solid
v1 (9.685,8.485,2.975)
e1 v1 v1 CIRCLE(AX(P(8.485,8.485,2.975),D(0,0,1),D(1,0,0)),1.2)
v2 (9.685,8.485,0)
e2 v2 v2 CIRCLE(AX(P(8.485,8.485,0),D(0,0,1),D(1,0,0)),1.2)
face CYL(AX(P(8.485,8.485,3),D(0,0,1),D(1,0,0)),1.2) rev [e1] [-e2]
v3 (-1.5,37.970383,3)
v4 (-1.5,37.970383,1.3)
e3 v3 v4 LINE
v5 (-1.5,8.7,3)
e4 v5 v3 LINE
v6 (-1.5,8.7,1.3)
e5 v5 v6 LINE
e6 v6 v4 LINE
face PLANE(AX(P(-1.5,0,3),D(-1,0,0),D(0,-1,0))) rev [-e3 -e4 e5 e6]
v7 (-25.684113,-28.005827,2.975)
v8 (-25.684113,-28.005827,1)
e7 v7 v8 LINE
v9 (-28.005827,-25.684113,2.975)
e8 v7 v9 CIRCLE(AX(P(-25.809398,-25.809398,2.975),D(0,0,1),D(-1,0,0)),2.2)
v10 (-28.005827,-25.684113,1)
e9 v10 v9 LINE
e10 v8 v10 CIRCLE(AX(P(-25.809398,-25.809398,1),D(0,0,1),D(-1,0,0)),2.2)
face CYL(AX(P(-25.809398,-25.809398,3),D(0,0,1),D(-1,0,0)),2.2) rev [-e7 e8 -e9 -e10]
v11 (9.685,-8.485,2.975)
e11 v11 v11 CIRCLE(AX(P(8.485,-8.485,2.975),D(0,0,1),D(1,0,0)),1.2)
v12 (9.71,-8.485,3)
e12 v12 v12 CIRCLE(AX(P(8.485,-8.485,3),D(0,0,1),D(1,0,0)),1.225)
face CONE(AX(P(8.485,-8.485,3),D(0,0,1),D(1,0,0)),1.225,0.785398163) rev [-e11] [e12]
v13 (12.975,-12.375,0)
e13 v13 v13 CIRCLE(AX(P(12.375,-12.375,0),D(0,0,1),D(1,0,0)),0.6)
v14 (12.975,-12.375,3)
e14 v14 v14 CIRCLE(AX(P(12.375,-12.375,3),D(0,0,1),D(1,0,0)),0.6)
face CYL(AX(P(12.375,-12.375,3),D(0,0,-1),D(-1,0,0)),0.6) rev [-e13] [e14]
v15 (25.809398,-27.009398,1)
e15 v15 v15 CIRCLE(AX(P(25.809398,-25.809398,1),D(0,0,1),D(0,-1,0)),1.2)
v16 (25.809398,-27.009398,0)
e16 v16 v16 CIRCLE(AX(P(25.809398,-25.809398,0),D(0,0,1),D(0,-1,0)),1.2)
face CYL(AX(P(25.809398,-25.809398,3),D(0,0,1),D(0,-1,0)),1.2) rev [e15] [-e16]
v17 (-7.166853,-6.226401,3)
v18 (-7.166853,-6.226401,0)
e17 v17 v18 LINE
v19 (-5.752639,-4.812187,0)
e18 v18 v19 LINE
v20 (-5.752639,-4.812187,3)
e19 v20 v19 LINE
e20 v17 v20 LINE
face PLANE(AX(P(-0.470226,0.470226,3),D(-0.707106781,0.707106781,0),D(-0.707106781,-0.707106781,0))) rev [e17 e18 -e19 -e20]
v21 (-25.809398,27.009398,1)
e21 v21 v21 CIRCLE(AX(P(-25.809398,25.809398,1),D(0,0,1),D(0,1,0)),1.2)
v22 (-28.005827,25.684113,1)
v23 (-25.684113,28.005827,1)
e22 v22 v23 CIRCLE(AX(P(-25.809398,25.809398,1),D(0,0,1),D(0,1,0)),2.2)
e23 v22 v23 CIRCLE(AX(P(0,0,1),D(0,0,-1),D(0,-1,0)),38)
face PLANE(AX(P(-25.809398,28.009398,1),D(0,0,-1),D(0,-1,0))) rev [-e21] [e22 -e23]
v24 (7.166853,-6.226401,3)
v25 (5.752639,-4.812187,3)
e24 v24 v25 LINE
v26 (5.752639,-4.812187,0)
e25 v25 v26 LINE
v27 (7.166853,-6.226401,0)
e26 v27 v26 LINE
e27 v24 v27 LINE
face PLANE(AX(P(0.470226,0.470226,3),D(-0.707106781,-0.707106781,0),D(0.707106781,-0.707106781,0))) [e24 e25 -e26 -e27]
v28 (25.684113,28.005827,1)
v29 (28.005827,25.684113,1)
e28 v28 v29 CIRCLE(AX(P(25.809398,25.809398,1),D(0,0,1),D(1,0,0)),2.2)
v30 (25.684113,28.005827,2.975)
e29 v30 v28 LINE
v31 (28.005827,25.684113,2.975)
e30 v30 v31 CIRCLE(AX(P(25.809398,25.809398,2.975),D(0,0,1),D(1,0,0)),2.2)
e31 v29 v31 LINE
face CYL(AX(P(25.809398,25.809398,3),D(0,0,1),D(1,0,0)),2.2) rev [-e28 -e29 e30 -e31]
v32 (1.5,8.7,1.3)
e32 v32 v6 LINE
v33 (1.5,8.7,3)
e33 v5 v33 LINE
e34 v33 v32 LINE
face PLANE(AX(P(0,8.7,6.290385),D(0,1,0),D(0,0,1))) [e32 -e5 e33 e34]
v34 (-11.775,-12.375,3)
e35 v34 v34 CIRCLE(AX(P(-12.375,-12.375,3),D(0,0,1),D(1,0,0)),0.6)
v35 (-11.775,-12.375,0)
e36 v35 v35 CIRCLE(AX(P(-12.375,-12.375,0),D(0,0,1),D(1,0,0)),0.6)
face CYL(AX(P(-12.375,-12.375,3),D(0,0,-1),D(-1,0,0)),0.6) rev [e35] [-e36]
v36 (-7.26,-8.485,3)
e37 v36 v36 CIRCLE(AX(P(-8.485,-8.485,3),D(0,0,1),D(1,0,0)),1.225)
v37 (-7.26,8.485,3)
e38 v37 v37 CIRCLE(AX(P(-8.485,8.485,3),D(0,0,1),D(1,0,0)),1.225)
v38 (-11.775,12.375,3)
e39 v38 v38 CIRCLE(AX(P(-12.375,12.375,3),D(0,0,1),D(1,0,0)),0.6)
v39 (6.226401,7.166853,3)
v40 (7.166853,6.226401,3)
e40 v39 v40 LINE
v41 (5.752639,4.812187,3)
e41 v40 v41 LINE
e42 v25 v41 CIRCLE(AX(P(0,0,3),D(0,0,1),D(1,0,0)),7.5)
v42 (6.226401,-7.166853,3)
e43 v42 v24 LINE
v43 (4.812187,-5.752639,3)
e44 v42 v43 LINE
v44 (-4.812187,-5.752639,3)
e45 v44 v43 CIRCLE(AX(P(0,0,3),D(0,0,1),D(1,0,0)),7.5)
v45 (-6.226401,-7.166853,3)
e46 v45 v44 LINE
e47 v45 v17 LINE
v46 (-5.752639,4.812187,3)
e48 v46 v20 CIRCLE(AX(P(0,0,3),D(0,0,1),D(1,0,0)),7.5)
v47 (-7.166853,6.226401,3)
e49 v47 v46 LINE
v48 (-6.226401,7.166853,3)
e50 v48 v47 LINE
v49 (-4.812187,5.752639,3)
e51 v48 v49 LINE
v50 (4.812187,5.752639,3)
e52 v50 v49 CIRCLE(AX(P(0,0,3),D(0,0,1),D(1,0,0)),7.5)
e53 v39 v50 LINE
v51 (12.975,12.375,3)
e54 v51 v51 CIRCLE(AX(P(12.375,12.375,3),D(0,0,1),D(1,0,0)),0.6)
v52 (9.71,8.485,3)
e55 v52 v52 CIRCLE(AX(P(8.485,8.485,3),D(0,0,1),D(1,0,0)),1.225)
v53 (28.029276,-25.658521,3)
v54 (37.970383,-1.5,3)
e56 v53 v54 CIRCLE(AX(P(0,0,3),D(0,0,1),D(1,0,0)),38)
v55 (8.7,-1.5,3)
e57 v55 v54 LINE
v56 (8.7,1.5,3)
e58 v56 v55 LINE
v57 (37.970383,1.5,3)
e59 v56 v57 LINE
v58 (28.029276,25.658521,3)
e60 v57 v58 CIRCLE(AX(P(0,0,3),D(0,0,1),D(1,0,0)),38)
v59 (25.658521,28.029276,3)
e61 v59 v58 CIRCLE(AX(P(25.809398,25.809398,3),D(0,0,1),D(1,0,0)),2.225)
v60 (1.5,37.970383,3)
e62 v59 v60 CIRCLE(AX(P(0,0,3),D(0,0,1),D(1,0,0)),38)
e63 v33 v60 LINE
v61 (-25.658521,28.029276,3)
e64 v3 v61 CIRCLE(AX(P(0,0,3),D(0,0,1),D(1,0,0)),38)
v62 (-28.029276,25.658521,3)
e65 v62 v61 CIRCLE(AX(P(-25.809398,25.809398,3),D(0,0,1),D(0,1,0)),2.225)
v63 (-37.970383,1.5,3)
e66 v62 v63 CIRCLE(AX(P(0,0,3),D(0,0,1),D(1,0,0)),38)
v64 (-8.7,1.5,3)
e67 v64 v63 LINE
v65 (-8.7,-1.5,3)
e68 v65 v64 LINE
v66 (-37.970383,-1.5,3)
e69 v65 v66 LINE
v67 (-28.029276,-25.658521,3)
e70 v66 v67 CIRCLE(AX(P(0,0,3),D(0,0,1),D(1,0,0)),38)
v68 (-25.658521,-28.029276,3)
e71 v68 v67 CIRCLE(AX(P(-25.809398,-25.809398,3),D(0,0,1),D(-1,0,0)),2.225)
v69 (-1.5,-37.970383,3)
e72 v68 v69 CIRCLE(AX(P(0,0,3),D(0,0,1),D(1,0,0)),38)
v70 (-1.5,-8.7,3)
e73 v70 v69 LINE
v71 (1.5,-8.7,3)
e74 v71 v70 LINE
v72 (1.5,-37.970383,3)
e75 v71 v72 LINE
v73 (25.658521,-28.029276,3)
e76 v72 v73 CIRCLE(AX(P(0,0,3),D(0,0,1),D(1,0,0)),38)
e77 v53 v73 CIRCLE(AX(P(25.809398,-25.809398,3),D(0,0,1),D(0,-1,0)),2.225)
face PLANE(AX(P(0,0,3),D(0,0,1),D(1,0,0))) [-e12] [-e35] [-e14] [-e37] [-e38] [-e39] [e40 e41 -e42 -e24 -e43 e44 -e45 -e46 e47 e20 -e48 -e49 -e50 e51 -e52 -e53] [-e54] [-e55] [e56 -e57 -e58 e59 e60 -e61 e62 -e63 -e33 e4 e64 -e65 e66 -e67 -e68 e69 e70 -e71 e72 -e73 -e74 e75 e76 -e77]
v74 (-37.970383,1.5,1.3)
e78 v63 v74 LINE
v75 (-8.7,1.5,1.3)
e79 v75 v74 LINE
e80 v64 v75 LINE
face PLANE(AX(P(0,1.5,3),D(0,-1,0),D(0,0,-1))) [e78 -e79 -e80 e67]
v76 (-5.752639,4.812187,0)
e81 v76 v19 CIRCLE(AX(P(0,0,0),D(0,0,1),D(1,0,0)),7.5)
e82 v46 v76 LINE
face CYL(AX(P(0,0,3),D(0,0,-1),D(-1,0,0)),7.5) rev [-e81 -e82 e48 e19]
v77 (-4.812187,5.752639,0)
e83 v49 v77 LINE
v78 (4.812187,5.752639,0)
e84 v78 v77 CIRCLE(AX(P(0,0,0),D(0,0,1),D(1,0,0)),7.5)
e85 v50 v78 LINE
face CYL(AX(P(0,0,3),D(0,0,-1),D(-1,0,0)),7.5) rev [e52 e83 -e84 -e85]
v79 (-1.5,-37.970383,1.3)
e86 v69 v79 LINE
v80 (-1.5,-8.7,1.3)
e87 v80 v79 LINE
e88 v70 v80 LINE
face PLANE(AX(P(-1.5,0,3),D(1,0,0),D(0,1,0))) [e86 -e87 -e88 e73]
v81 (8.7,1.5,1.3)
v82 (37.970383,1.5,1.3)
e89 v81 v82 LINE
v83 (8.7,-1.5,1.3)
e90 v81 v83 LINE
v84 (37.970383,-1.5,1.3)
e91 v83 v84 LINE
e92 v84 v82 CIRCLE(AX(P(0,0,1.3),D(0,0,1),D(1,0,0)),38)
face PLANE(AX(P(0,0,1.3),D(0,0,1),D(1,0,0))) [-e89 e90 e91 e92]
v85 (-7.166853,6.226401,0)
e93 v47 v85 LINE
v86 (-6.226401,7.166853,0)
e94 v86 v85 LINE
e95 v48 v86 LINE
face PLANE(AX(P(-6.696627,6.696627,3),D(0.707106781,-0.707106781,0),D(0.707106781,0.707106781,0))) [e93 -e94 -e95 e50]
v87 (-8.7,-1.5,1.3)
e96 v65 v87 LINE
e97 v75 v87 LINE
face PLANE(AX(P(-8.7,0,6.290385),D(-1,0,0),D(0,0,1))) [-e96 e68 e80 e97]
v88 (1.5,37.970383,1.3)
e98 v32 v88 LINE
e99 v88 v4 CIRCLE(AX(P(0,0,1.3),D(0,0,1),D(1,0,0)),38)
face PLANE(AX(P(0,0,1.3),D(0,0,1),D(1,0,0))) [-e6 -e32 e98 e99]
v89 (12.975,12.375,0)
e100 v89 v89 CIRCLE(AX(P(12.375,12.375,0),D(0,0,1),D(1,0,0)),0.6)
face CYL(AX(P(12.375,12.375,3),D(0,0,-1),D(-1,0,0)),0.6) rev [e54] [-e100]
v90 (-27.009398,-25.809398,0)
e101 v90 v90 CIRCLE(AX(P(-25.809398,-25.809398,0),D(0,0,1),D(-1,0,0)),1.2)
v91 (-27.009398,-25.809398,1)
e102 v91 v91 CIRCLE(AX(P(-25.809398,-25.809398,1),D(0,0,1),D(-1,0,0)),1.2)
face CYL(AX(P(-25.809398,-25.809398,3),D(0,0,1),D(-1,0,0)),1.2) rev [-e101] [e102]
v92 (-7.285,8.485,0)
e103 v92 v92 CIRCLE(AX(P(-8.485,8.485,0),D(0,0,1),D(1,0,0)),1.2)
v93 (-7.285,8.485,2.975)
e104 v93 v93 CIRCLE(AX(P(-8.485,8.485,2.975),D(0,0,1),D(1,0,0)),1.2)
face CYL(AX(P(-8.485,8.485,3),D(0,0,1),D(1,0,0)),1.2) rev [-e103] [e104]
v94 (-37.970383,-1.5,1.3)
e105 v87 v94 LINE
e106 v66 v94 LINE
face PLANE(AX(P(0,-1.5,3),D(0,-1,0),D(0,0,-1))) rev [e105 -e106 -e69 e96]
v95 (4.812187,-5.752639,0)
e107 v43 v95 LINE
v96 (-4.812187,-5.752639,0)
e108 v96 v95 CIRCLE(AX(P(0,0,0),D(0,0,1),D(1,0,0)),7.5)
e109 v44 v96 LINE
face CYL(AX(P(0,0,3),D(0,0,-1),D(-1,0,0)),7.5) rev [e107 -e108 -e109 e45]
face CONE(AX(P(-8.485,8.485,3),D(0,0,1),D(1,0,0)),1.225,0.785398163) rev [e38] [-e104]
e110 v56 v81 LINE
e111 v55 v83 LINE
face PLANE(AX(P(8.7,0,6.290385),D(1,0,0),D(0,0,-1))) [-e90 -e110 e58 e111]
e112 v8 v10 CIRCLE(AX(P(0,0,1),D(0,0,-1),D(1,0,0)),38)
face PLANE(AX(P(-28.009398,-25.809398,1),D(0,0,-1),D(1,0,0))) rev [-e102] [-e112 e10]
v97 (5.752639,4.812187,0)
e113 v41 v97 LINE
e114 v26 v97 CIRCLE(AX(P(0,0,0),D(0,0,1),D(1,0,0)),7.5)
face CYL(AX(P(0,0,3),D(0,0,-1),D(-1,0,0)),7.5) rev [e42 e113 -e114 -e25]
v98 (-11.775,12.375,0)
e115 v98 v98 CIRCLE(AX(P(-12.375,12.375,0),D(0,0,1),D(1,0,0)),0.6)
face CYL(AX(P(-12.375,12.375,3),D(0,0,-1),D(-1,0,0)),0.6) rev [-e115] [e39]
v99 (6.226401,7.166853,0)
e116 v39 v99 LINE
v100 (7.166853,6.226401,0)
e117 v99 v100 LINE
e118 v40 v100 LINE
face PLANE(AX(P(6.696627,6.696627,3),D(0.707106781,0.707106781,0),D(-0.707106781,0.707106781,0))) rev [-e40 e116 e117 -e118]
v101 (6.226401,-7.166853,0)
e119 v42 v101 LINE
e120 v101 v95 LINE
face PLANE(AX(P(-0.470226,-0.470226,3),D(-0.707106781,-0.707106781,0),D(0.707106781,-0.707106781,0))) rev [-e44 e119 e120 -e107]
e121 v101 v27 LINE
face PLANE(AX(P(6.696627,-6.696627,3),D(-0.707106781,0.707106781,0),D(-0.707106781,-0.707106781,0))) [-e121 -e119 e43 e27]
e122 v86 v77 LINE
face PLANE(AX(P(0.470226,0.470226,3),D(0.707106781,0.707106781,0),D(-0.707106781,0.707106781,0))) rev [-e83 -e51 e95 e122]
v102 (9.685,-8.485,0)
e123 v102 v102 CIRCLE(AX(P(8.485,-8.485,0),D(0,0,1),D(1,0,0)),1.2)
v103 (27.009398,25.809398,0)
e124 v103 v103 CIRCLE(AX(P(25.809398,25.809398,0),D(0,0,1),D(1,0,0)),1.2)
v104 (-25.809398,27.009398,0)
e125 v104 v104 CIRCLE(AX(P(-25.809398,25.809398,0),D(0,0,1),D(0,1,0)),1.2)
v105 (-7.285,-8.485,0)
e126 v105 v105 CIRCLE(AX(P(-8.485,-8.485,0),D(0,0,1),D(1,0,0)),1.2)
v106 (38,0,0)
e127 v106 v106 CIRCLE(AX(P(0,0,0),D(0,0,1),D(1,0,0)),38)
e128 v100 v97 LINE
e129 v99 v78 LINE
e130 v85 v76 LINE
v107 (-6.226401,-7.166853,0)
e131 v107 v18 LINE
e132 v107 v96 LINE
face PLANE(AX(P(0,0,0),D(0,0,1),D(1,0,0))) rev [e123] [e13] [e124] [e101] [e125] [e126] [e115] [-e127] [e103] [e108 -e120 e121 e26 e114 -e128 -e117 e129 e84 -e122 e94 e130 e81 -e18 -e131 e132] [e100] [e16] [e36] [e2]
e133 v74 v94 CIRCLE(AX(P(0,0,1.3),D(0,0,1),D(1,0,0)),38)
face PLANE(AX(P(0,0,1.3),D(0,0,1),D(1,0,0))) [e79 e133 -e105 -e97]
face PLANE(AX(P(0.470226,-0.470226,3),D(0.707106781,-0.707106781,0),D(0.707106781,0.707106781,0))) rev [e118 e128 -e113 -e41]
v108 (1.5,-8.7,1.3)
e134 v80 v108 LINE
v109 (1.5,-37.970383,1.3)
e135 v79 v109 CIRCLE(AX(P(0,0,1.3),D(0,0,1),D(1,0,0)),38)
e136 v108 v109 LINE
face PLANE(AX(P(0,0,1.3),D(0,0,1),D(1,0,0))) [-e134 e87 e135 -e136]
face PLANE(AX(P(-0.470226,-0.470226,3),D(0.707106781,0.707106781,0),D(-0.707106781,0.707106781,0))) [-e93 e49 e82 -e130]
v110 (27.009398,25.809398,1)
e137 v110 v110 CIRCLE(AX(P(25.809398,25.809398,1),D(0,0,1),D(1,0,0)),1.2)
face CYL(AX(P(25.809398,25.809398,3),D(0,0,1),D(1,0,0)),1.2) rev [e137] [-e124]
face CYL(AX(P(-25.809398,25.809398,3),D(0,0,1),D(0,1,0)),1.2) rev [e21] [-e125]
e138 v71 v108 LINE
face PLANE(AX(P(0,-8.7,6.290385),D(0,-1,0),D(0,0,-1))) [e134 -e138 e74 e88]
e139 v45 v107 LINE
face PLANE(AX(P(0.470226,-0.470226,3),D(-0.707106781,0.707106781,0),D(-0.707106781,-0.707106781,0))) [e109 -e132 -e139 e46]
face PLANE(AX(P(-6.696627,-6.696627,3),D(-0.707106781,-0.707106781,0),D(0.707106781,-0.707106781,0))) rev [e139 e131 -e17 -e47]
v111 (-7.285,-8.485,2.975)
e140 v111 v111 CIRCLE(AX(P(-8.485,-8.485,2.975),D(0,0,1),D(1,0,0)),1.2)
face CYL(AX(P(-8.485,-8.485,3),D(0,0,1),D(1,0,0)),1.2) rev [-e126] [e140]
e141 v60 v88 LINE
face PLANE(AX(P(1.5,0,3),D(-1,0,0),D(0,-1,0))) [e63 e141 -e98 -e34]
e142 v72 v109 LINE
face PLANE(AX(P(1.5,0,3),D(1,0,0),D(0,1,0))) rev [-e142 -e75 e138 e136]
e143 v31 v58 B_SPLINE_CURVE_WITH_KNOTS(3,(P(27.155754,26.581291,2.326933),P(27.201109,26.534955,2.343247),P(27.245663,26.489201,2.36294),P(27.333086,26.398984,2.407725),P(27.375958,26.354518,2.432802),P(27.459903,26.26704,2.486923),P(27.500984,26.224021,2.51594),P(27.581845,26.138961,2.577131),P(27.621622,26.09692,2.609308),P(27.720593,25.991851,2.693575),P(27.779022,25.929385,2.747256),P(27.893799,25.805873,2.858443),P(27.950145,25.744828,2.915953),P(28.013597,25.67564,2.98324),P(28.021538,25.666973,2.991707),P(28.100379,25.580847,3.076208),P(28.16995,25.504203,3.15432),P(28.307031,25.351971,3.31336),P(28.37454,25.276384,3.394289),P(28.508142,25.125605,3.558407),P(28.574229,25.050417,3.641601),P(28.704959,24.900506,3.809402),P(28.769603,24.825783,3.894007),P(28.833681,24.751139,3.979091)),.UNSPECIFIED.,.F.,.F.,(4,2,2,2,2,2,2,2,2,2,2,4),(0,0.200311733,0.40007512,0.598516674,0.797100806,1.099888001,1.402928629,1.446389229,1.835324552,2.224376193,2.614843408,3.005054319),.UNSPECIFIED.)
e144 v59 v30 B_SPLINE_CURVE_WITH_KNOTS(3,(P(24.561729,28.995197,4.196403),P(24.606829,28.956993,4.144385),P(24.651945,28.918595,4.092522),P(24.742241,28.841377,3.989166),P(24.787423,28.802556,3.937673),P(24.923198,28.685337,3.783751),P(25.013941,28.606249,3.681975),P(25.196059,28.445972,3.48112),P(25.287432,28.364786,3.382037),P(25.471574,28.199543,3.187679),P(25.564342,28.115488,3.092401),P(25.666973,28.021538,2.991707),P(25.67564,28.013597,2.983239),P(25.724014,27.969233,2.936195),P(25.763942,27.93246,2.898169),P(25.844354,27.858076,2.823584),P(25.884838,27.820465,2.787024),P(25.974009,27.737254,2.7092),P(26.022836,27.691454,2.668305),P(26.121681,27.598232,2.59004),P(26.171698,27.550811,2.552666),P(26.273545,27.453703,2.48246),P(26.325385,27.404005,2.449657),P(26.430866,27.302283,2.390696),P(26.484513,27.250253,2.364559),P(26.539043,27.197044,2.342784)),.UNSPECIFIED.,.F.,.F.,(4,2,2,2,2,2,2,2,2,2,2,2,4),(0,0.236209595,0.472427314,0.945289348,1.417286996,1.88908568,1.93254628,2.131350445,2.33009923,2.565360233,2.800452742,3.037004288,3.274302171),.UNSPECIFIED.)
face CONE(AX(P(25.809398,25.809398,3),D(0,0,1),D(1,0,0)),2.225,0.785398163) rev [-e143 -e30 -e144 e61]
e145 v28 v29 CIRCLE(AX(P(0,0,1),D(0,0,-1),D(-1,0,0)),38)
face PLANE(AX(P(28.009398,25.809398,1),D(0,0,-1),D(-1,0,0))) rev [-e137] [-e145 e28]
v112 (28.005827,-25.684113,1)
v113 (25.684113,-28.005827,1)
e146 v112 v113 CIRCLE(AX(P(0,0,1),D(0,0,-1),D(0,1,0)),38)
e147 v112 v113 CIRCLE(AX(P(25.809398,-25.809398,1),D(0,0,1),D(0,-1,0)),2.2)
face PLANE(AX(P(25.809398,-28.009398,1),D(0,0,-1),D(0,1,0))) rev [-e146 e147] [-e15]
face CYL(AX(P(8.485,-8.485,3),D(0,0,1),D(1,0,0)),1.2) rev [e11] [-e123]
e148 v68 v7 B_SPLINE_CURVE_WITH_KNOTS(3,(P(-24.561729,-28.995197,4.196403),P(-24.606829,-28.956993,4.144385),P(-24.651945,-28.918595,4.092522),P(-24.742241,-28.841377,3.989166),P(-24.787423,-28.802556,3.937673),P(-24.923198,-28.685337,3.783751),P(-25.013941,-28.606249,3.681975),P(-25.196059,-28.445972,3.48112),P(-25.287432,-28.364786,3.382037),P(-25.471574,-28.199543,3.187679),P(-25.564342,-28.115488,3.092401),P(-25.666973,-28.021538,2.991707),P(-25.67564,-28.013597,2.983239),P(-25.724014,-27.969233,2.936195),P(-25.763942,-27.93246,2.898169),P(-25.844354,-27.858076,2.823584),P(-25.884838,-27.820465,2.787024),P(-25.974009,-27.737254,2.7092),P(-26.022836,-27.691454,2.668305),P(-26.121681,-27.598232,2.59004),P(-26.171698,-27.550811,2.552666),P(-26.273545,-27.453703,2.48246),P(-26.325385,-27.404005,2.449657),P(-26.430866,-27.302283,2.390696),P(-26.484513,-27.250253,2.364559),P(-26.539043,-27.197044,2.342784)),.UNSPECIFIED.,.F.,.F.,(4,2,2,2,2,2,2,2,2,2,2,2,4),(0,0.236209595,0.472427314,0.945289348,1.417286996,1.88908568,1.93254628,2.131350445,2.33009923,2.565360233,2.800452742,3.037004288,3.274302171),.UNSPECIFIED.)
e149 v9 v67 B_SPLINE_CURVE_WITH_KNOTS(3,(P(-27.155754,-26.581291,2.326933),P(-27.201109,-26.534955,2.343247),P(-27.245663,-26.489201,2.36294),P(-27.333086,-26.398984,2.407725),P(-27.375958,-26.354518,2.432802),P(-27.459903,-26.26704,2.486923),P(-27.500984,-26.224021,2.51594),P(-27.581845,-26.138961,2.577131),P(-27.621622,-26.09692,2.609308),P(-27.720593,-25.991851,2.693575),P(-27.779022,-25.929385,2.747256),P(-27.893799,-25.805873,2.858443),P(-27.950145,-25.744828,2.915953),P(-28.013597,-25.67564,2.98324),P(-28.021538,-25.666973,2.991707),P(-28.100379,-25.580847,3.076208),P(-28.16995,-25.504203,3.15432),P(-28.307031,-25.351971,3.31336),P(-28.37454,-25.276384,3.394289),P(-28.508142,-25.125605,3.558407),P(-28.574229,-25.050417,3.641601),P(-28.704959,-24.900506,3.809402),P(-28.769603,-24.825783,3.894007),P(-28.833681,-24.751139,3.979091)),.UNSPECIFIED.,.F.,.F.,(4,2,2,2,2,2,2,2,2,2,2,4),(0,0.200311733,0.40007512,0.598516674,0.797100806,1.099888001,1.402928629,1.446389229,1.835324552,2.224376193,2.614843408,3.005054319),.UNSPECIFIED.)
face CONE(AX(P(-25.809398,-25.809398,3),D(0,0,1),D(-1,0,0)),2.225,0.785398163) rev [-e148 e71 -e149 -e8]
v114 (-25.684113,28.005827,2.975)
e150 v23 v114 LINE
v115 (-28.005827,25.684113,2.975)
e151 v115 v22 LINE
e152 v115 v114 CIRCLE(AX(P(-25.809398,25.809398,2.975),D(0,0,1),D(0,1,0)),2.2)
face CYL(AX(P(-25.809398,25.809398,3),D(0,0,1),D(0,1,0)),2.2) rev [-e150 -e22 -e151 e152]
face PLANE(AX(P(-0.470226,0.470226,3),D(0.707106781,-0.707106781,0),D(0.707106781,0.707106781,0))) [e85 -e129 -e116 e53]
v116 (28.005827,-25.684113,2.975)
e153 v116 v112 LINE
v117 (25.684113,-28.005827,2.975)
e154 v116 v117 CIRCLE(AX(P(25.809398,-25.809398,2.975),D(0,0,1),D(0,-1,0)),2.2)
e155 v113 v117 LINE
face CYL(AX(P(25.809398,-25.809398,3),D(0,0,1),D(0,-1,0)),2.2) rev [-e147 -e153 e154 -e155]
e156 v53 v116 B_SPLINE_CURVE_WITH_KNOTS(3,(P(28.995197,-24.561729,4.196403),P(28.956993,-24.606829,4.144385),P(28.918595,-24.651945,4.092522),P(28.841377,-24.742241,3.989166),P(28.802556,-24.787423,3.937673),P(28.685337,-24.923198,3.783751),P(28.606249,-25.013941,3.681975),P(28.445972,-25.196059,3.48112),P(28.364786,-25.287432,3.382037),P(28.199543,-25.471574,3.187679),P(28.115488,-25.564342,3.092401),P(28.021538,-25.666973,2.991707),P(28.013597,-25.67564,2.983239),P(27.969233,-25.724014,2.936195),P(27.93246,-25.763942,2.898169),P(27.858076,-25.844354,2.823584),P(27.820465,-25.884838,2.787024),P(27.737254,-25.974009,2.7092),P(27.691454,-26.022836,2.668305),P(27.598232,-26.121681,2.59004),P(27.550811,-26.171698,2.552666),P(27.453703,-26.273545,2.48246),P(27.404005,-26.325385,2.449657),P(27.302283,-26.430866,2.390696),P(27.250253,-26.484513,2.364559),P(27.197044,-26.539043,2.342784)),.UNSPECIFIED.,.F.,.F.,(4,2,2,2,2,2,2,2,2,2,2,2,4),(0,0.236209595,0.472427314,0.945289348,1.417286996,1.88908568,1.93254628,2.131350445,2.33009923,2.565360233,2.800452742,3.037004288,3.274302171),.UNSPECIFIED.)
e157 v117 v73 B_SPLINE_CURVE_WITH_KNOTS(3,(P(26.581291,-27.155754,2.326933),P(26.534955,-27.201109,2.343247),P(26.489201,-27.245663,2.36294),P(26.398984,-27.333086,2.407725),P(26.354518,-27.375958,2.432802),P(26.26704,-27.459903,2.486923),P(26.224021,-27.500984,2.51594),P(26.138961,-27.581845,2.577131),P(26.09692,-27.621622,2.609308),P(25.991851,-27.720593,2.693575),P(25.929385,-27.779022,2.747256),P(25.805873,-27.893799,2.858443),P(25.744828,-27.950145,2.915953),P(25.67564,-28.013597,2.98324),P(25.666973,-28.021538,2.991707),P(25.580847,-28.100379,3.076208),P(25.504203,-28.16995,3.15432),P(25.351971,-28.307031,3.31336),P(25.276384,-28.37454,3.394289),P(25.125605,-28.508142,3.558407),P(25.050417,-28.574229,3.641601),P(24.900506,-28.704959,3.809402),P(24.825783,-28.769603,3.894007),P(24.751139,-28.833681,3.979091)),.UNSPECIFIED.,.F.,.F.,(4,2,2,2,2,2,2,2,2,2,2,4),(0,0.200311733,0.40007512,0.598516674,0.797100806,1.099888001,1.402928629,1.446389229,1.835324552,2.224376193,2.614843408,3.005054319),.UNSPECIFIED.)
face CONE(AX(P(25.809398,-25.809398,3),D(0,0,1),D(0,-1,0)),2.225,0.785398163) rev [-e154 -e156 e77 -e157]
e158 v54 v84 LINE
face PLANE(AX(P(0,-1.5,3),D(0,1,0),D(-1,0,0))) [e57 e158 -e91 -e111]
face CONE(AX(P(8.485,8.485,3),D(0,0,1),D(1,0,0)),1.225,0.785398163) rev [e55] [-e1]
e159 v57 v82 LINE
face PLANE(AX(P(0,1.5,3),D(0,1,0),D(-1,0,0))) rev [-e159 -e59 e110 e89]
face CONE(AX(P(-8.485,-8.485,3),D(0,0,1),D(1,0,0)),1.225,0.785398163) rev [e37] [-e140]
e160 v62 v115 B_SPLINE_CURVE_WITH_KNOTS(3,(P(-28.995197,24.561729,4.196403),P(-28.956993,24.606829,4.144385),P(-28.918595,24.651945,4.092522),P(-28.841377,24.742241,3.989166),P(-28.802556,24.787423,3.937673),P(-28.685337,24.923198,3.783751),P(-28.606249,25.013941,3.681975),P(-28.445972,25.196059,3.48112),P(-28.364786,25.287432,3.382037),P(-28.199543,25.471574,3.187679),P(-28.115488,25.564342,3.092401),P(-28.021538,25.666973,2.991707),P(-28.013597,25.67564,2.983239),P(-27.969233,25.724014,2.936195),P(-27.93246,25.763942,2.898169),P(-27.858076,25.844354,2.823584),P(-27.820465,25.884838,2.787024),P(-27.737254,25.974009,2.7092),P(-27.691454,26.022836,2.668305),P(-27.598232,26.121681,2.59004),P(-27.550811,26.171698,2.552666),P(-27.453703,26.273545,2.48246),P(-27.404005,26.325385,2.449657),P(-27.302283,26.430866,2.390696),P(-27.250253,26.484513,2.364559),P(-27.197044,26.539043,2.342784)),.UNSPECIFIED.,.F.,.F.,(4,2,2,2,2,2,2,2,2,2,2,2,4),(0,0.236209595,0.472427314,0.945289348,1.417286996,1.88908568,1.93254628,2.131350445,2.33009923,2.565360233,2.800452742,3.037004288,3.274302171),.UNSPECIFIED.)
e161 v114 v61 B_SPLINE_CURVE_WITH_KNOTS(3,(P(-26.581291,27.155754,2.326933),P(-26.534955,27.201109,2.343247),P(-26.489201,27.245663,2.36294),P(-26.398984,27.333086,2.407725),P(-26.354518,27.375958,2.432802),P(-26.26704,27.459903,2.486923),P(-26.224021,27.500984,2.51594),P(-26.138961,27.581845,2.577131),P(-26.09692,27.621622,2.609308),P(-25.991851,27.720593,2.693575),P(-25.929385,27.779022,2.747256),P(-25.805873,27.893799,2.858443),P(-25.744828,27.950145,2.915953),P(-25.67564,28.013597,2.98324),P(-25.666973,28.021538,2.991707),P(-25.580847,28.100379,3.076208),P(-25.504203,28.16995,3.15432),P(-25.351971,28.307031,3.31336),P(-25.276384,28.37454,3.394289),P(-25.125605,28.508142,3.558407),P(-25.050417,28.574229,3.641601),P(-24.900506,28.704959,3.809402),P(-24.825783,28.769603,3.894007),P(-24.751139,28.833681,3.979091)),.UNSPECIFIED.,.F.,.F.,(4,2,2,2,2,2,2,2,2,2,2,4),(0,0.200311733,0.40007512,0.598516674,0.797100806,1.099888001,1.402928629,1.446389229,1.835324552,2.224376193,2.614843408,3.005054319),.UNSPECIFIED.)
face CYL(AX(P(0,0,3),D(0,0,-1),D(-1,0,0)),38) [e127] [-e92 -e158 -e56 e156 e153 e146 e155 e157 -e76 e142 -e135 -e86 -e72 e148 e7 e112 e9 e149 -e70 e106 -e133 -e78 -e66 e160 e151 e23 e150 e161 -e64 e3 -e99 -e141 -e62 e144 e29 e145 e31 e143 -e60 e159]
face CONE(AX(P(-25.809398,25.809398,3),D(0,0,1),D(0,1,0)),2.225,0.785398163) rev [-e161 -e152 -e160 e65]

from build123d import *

# Parameters (mm, degrees)
SKETCH1_R             = 0.6
BOSS_EXTRUDE1_DEPTH   = 3
BOSS_EXTRUDE1_2_DEPTH = 3
BOSS_EXTRUDE1_3_DEPTH = 3
BOSS_EXTRUDE1_4_DEPTH = 3
BOSS_EXTRUDE2_DEPTH   = 1.3
BOSS_EXTRUDE3_DEPTH   = 3
CIRPATTERN1_COUNT     = 4


# Read off the part's stored shape, not the designer's step: M2 Clearance Hole1
with BuildPart() as part:
    # Sketch1 → Boss-Extrude1 (new body)
    with BuildSketch(Plane(origin=(0, 0, 0), x_dir=(0, 1, 0), z_dir=(0, 0, 1))):
        with BuildLine():
            Line((-1.5, 7.348469228), (-1.5, 37.970383195))
            ThreePointArc((-1.5, 37.970383195), (-26.870057685, 26.870057685), (-37.970383195, 1.5))
            Line((-37.970383195, 1.5), (-7.348469228, 1.5))
            ThreePointArc((-7.348469228, 1.5), (-6.756656365, 3.255394717), (-5.752639047, 4.812187028))
            Line((-5.752639047, 4.812187028), (-7.166852609, 6.226400591))
            Line((-7.166852609, 6.226400591), (-6.226400591, 7.166852609))
            Line((-6.226400591, 7.166852609), (-4.812187028, 5.752639047))
            ThreePointArc((-4.812187028, 5.752639047), (-3.255394717, 6.756656365), (-1.5, 7.348469228))
        make_face()
        with Locations(Location((-12.375, 12.375, 0), (0, 0, 270))):
            Circle(SKETCH1_R, mode=Mode.SUBTRACT)
    extrude(amount=BOSS_EXTRUDE1_DEPTH)

    # Sketch1<9> → Boss-Extrude2 (add)
    with BuildSketch(Plane(origin=(0, 0, 0), x_dir=(0, 1, 0), z_dir=(0, 0, 1))):
        with BuildLine():
            Line((1.5, 7.348469228), (1.5, 37.970383195))
            ThreePointArc((1.5, 37.970383195), (0, 38), (-1.5, 37.970383195))
            Line((-1.5, 37.970383195), (-1.5, 7.348469228))
            ThreePointArc((-1.5, 7.348469228), (0, 7.5), (1.5, 7.348469228))
        make_face()
        with BuildLine():
            ThreePointArc((-37.970383195, 1.5), (-38, 0), (-37.970383195, -1.5))
            Line((-37.970383195, -1.5), (-7.348469228, -1.5))
            ThreePointArc((-7.348469228, -1.5), (-7.5, 0), (-7.348469228, 1.5))
            Line((-7.348469228, 1.5), (-37.970383195, 1.5))
        make_face()
        with BuildLine():
            ThreePointArc((37.970383195, -1.5), (38, 0), (37.970383195, 1.5))
            Line((37.970383195, 1.5), (7.348469228, 1.5))
            ThreePointArc((7.348469228, 1.5), (7.5, 0), (7.348469228, -1.5))
            Line((7.348469228, -1.5), (37.970383195, -1.5))
        make_face()
        with BuildLine():
            ThreePointArc((-1.5, -37.970383195), (0, -38), (1.5, -37.970383195))
            Line((1.5, -37.970383195), (1.5, -7.348469228))
            ThreePointArc((1.5, -7.348469228), (0, -7.5), (-1.5, -7.348469228))
            Line((-1.5, -7.348469228), (-1.5, -37.970383195))
        make_face()
    extrude(amount=BOSS_EXTRUDE2_DEPTH)


with BuildPart() as body_2:
    # Sketch1 → Boss-Extrude1 2 (new body)
    with BuildSketch(Plane(origin=(0, 0, 0), x_dir=(0, 1, 0), z_dir=(0, 0, 1))):
        with BuildLine():
            Line((1.5, 37.970383195), (1.5, 7.348469228))
            ThreePointArc((1.5, 7.348469228), (3.255394717, 6.756656365), (4.812187028, 5.752639047))
            Line((4.812187028, 5.752639047), (6.226400591, 7.166852609))
            Line((6.226400591, 7.166852609), (7.166852609, 6.226400591))
            Line((7.166852609, 6.226400591), (5.752639047, 4.812187028))
            ThreePointArc((5.752639047, 4.812187028), (6.756656365, 3.255394717), (7.348469228, 1.5))
            Line((7.348469228, 1.5), (37.970383195, 1.5))
            ThreePointArc((37.970383195, 1.5), (26.870057685, 26.870057685), (1.5, 37.970383195))
        make_face()
        with Locations(Location((12.375, 12.375, 0), (0, 0, 270))):
            Circle(SKETCH1_R, mode=Mode.SUBTRACT)
    extrude(amount=BOSS_EXTRUDE1_2_DEPTH)

    # M2 Clearance Hole1 4 outline → M2 Clearance Hole1 4 (revolve, cut)
    with BuildSketch(Plane(origin=(-8.485, 8.485, 0), x_dir=(1, 0, 0), z_dir=(0, -1, 0))):
        Polygon((0, 0), (1.2, 0), (1.2, 2.975), (1.225, 3), (0, 3), align=None)
    revolve(axis=Axis((-8.485, 8.485, 0), (0, 0, 1)), mode=Mode.SUBTRACT)



with BuildPart() as body_3:
    # Sketch1 → Boss-Extrude1 3 (new body)
    with BuildSketch(Plane(origin=(0, 0, 0), x_dir=(0, 1, 0), z_dir=(0, 0, 1))):
        with BuildLine():
            Line((-7.348469228, -1.5), (-37.970383195, -1.5))
            ThreePointArc((-37.970383195, -1.5), (-26.870057685, -26.870057685), (-1.5, -37.970383195))
            Line((-1.5, -37.970383195), (-1.5, -7.348469228))
            ThreePointArc((-1.5, -7.348469228), (-3.255394717, -6.756656365), (-4.812187028, -5.752639047))
            Line((-4.812187028, -5.752639047), (-6.226400591, -7.166852609))
            Line((-6.226400591, -7.166852609), (-7.166852609, -6.226400591))
            Line((-7.166852609, -6.226400591), (-5.752639047, -4.812187028))
            ThreePointArc((-5.752639047, -4.812187028), (-6.756656365, -3.255394717), (-7.348469228, -1.5))
        make_face()
        with Locations(Location((-12.375, -12.375, 0), (0, 0, 270))):
            Circle(SKETCH1_R, mode=Mode.SUBTRACT)
    extrude(amount=BOSS_EXTRUDE1_3_DEPTH)

    # M2 Clearance Hole1 2 outline → M2 Clearance Hole1 2 (revolve, cut)
    with BuildSketch(Plane(origin=(8.485, -8.485, 0), x_dir=(1, 0, 0), z_dir=(0, -1, 0))):
        Polygon((0, 0), (1.2, 0), (1.2, 2.975), (1.225, 3), (0, 3), align=None)
    revolve(axis=Axis((8.485, -8.485, 0), (0, 0, 1)), mode=Mode.SUBTRACT)


with BuildPart() as body_4:
    # Sketch1 → Boss-Extrude1 4 (new body)
    with BuildSketch(Plane(origin=(0, 0, 0), x_dir=(0, 1, 0), z_dir=(0, 0, 1))):
        with BuildLine():
            Line((37.970383195, -1.5), (7.348469228, -1.5))
            ThreePointArc((7.348469228, -1.5), (6.756656365, -3.255394717), (5.752639047, -4.812187028))
            Line((5.752639047, -4.812187028), (7.166852609, -6.226400591))
            Line((7.166852609, -6.226400591), (6.226400591, -7.166852609))
            Line((6.226400591, -7.166852609), (4.812187028, -5.752639047))
            ThreePointArc((4.812187028, -5.752639047), (3.255394717, -6.756656365), (1.5, -7.348469228))
            Line((1.5, -7.348469228), (1.5, -37.970383195))
            ThreePointArc((1.5, -37.970383195), (26.870057685, -26.870057685), (37.970383195, -1.5))
        make_face()
        with Locations(Location((12.375, -12.375, 0), (0, 0, 270))):
            Circle(SKETCH1_R, mode=Mode.SUBTRACT)
    extrude(amount=BOSS_EXTRUDE1_4_DEPTH)

    # M2 Clearance Hole1 outline → M2 Clearance Hole1 (revolve, cut)
    with BuildSketch(Plane(origin=(8.485, 8.485, 0), x_dir=(1, 0, 0), z_dir=(0, -1, 0))):
        Polygon((0, 0), (1.2, 0), (1.2, 2.975), (1.225, 3), (0, 3), align=None)
    revolve(axis=Axis((8.485, 8.485, 0), (0, 0, 1)), mode=Mode.SUBTRACT)


with BuildPart() as boss_extrude2_piece_1:
    # of the separate pieces the step leaves, piece 1, a body of its own (boss_extrude2_pieces)
    add(part.part.solids().sort_by_distance((-37.970383195, -1.5, 1.3))[0])

    # M2 Clearance Hole1 3 outline → M2 Clearance Hole1 3 (revolve, cut)
    with BuildSketch(Plane(origin=(-8.485, -8.485, 0), x_dir=(1, 0, 0), z_dir=(0, -1, 0))):
        Polygon((0, 0), (1.2, 0), (1.2, 2.975), (1.225, 3), (0, 3), align=None)
    revolve(axis=Axis((-8.485, -8.485, 0), (0, 0, 1)), mode=Mode.SUBTRACT)


with BuildPart() as boss_extrude2_piece_2:
    # of the separate pieces the step leaves, piece 2, a body of its own (boss_extrude2_pieces)
    add(part.part.solids().sort_by_distance((-1.5, 7.348469228, 0))[0])


with BuildPart() as boss_extrude2_piece_3:
    # of the separate pieces the step leaves, piece 3, a body of its own (boss_extrude2_pieces)
    add(part.part.solids().sort_by_distance((37.970383195, -1.5, 0))[0])


with BuildPart() as body_2_1:
    add(body_2.part)

    add(body_3.part)  # Boss-Extrude3 merges body 3

    add(body_4.part)  # Boss-Extrude3 merges body 4

    add(boss_extrude2_piece_1.part)  # Boss-Extrude3 merges Boss-Extrude2 piece 1

    add(boss_extrude2_piece_2.part)  # Boss-Extrude3 merges Boss-Extrude2 piece 2

    add(boss_extrude2_piece_3.part)  # Boss-Extrude3 merges Boss-Extrude2 piece 3
    # Sketch1<10> → Boss-Extrude3 (add)
    with BuildSketch(Plane(origin=(0, 0, 0), x_dir=(0, 1, 0), z_dir=(0, 0, 1))):
        with BuildLine():
            Line((-1.5, -7.348469228), (-1.5, -8.7))
            Line((-1.5, -8.7), (1.5, -8.7))
            Line((1.5, -8.7), (1.5, -7.348469228))
            ThreePointArc((1.5, -7.348469228), (0, -7.5), (-1.5, -7.348469228))
        make_face()
        with BuildLine():
            Line((-7.348469228, 1.5), (-8.7, 1.5))
            Line((-8.7, 1.5), (-8.7, -1.5))
            Line((-8.7, -1.5), (-7.348469228, -1.5))
            ThreePointArc((-7.348469228, -1.5), (-7.5, 0), (-7.348469228, 1.5))
        make_face()
        with BuildLine():
            Line((1.5, 8.7), (-1.5, 8.7))
            Line((-1.5, 8.7), (-1.5, 7.348469228))
            ThreePointArc((-1.5, 7.348469228), (0, 7.5), (1.5, 7.348469228))
            Line((1.5, 7.348469228), (1.5, 8.7))
        make_face()
        with BuildLine():
            Line((8.7, -1.5), (8.7, 1.5))
            Line((8.7, 1.5), (7.348469228, 1.5))
            ThreePointArc((7.348469228, 1.5), (7.5, 0), (7.348469228, -1.5))
            Line((7.348469228, -1.5), (8.7, -1.5))
        make_face()
    extrude(amount=BOSS_EXTRUDE3_DEPTH)

    # Sketch8 → CBORE for M2 SHCS1 (revolve, cut)
    with BuildSketch(Plane(origin=(25.809397513, 25.809397513, 3), x_dir=(0, -1, 0), z_dir=(1, 0, 0))):
        Polygon((0, 0), (0, 3), (1.2, 3), (1.2, 2), (2.2, 2), (2.2, 0.025), (2.225, 0), align=None)
    cbore_for_m2_shcs1 = revolve(axis=Axis((25.809397513, 25.809397513, 9.35), (0, 0, -1)), mode=Mode.SUBTRACT)

    # CirPattern1: CBORE for M2 SHCS1 ×4 about axis
    cirpattern1_axis = Axis((0, 0, 0), (0, 0, 1))
    for i in range(1, CIRPATTERN1_COUNT):
        add(cbore_for_m2_shcs1.rotate(cirpattern1_axis, i * 360 / CIRPATTERN1_COUNT), mode=Mode.SUBTRACT)


solid = body_2_1.part
